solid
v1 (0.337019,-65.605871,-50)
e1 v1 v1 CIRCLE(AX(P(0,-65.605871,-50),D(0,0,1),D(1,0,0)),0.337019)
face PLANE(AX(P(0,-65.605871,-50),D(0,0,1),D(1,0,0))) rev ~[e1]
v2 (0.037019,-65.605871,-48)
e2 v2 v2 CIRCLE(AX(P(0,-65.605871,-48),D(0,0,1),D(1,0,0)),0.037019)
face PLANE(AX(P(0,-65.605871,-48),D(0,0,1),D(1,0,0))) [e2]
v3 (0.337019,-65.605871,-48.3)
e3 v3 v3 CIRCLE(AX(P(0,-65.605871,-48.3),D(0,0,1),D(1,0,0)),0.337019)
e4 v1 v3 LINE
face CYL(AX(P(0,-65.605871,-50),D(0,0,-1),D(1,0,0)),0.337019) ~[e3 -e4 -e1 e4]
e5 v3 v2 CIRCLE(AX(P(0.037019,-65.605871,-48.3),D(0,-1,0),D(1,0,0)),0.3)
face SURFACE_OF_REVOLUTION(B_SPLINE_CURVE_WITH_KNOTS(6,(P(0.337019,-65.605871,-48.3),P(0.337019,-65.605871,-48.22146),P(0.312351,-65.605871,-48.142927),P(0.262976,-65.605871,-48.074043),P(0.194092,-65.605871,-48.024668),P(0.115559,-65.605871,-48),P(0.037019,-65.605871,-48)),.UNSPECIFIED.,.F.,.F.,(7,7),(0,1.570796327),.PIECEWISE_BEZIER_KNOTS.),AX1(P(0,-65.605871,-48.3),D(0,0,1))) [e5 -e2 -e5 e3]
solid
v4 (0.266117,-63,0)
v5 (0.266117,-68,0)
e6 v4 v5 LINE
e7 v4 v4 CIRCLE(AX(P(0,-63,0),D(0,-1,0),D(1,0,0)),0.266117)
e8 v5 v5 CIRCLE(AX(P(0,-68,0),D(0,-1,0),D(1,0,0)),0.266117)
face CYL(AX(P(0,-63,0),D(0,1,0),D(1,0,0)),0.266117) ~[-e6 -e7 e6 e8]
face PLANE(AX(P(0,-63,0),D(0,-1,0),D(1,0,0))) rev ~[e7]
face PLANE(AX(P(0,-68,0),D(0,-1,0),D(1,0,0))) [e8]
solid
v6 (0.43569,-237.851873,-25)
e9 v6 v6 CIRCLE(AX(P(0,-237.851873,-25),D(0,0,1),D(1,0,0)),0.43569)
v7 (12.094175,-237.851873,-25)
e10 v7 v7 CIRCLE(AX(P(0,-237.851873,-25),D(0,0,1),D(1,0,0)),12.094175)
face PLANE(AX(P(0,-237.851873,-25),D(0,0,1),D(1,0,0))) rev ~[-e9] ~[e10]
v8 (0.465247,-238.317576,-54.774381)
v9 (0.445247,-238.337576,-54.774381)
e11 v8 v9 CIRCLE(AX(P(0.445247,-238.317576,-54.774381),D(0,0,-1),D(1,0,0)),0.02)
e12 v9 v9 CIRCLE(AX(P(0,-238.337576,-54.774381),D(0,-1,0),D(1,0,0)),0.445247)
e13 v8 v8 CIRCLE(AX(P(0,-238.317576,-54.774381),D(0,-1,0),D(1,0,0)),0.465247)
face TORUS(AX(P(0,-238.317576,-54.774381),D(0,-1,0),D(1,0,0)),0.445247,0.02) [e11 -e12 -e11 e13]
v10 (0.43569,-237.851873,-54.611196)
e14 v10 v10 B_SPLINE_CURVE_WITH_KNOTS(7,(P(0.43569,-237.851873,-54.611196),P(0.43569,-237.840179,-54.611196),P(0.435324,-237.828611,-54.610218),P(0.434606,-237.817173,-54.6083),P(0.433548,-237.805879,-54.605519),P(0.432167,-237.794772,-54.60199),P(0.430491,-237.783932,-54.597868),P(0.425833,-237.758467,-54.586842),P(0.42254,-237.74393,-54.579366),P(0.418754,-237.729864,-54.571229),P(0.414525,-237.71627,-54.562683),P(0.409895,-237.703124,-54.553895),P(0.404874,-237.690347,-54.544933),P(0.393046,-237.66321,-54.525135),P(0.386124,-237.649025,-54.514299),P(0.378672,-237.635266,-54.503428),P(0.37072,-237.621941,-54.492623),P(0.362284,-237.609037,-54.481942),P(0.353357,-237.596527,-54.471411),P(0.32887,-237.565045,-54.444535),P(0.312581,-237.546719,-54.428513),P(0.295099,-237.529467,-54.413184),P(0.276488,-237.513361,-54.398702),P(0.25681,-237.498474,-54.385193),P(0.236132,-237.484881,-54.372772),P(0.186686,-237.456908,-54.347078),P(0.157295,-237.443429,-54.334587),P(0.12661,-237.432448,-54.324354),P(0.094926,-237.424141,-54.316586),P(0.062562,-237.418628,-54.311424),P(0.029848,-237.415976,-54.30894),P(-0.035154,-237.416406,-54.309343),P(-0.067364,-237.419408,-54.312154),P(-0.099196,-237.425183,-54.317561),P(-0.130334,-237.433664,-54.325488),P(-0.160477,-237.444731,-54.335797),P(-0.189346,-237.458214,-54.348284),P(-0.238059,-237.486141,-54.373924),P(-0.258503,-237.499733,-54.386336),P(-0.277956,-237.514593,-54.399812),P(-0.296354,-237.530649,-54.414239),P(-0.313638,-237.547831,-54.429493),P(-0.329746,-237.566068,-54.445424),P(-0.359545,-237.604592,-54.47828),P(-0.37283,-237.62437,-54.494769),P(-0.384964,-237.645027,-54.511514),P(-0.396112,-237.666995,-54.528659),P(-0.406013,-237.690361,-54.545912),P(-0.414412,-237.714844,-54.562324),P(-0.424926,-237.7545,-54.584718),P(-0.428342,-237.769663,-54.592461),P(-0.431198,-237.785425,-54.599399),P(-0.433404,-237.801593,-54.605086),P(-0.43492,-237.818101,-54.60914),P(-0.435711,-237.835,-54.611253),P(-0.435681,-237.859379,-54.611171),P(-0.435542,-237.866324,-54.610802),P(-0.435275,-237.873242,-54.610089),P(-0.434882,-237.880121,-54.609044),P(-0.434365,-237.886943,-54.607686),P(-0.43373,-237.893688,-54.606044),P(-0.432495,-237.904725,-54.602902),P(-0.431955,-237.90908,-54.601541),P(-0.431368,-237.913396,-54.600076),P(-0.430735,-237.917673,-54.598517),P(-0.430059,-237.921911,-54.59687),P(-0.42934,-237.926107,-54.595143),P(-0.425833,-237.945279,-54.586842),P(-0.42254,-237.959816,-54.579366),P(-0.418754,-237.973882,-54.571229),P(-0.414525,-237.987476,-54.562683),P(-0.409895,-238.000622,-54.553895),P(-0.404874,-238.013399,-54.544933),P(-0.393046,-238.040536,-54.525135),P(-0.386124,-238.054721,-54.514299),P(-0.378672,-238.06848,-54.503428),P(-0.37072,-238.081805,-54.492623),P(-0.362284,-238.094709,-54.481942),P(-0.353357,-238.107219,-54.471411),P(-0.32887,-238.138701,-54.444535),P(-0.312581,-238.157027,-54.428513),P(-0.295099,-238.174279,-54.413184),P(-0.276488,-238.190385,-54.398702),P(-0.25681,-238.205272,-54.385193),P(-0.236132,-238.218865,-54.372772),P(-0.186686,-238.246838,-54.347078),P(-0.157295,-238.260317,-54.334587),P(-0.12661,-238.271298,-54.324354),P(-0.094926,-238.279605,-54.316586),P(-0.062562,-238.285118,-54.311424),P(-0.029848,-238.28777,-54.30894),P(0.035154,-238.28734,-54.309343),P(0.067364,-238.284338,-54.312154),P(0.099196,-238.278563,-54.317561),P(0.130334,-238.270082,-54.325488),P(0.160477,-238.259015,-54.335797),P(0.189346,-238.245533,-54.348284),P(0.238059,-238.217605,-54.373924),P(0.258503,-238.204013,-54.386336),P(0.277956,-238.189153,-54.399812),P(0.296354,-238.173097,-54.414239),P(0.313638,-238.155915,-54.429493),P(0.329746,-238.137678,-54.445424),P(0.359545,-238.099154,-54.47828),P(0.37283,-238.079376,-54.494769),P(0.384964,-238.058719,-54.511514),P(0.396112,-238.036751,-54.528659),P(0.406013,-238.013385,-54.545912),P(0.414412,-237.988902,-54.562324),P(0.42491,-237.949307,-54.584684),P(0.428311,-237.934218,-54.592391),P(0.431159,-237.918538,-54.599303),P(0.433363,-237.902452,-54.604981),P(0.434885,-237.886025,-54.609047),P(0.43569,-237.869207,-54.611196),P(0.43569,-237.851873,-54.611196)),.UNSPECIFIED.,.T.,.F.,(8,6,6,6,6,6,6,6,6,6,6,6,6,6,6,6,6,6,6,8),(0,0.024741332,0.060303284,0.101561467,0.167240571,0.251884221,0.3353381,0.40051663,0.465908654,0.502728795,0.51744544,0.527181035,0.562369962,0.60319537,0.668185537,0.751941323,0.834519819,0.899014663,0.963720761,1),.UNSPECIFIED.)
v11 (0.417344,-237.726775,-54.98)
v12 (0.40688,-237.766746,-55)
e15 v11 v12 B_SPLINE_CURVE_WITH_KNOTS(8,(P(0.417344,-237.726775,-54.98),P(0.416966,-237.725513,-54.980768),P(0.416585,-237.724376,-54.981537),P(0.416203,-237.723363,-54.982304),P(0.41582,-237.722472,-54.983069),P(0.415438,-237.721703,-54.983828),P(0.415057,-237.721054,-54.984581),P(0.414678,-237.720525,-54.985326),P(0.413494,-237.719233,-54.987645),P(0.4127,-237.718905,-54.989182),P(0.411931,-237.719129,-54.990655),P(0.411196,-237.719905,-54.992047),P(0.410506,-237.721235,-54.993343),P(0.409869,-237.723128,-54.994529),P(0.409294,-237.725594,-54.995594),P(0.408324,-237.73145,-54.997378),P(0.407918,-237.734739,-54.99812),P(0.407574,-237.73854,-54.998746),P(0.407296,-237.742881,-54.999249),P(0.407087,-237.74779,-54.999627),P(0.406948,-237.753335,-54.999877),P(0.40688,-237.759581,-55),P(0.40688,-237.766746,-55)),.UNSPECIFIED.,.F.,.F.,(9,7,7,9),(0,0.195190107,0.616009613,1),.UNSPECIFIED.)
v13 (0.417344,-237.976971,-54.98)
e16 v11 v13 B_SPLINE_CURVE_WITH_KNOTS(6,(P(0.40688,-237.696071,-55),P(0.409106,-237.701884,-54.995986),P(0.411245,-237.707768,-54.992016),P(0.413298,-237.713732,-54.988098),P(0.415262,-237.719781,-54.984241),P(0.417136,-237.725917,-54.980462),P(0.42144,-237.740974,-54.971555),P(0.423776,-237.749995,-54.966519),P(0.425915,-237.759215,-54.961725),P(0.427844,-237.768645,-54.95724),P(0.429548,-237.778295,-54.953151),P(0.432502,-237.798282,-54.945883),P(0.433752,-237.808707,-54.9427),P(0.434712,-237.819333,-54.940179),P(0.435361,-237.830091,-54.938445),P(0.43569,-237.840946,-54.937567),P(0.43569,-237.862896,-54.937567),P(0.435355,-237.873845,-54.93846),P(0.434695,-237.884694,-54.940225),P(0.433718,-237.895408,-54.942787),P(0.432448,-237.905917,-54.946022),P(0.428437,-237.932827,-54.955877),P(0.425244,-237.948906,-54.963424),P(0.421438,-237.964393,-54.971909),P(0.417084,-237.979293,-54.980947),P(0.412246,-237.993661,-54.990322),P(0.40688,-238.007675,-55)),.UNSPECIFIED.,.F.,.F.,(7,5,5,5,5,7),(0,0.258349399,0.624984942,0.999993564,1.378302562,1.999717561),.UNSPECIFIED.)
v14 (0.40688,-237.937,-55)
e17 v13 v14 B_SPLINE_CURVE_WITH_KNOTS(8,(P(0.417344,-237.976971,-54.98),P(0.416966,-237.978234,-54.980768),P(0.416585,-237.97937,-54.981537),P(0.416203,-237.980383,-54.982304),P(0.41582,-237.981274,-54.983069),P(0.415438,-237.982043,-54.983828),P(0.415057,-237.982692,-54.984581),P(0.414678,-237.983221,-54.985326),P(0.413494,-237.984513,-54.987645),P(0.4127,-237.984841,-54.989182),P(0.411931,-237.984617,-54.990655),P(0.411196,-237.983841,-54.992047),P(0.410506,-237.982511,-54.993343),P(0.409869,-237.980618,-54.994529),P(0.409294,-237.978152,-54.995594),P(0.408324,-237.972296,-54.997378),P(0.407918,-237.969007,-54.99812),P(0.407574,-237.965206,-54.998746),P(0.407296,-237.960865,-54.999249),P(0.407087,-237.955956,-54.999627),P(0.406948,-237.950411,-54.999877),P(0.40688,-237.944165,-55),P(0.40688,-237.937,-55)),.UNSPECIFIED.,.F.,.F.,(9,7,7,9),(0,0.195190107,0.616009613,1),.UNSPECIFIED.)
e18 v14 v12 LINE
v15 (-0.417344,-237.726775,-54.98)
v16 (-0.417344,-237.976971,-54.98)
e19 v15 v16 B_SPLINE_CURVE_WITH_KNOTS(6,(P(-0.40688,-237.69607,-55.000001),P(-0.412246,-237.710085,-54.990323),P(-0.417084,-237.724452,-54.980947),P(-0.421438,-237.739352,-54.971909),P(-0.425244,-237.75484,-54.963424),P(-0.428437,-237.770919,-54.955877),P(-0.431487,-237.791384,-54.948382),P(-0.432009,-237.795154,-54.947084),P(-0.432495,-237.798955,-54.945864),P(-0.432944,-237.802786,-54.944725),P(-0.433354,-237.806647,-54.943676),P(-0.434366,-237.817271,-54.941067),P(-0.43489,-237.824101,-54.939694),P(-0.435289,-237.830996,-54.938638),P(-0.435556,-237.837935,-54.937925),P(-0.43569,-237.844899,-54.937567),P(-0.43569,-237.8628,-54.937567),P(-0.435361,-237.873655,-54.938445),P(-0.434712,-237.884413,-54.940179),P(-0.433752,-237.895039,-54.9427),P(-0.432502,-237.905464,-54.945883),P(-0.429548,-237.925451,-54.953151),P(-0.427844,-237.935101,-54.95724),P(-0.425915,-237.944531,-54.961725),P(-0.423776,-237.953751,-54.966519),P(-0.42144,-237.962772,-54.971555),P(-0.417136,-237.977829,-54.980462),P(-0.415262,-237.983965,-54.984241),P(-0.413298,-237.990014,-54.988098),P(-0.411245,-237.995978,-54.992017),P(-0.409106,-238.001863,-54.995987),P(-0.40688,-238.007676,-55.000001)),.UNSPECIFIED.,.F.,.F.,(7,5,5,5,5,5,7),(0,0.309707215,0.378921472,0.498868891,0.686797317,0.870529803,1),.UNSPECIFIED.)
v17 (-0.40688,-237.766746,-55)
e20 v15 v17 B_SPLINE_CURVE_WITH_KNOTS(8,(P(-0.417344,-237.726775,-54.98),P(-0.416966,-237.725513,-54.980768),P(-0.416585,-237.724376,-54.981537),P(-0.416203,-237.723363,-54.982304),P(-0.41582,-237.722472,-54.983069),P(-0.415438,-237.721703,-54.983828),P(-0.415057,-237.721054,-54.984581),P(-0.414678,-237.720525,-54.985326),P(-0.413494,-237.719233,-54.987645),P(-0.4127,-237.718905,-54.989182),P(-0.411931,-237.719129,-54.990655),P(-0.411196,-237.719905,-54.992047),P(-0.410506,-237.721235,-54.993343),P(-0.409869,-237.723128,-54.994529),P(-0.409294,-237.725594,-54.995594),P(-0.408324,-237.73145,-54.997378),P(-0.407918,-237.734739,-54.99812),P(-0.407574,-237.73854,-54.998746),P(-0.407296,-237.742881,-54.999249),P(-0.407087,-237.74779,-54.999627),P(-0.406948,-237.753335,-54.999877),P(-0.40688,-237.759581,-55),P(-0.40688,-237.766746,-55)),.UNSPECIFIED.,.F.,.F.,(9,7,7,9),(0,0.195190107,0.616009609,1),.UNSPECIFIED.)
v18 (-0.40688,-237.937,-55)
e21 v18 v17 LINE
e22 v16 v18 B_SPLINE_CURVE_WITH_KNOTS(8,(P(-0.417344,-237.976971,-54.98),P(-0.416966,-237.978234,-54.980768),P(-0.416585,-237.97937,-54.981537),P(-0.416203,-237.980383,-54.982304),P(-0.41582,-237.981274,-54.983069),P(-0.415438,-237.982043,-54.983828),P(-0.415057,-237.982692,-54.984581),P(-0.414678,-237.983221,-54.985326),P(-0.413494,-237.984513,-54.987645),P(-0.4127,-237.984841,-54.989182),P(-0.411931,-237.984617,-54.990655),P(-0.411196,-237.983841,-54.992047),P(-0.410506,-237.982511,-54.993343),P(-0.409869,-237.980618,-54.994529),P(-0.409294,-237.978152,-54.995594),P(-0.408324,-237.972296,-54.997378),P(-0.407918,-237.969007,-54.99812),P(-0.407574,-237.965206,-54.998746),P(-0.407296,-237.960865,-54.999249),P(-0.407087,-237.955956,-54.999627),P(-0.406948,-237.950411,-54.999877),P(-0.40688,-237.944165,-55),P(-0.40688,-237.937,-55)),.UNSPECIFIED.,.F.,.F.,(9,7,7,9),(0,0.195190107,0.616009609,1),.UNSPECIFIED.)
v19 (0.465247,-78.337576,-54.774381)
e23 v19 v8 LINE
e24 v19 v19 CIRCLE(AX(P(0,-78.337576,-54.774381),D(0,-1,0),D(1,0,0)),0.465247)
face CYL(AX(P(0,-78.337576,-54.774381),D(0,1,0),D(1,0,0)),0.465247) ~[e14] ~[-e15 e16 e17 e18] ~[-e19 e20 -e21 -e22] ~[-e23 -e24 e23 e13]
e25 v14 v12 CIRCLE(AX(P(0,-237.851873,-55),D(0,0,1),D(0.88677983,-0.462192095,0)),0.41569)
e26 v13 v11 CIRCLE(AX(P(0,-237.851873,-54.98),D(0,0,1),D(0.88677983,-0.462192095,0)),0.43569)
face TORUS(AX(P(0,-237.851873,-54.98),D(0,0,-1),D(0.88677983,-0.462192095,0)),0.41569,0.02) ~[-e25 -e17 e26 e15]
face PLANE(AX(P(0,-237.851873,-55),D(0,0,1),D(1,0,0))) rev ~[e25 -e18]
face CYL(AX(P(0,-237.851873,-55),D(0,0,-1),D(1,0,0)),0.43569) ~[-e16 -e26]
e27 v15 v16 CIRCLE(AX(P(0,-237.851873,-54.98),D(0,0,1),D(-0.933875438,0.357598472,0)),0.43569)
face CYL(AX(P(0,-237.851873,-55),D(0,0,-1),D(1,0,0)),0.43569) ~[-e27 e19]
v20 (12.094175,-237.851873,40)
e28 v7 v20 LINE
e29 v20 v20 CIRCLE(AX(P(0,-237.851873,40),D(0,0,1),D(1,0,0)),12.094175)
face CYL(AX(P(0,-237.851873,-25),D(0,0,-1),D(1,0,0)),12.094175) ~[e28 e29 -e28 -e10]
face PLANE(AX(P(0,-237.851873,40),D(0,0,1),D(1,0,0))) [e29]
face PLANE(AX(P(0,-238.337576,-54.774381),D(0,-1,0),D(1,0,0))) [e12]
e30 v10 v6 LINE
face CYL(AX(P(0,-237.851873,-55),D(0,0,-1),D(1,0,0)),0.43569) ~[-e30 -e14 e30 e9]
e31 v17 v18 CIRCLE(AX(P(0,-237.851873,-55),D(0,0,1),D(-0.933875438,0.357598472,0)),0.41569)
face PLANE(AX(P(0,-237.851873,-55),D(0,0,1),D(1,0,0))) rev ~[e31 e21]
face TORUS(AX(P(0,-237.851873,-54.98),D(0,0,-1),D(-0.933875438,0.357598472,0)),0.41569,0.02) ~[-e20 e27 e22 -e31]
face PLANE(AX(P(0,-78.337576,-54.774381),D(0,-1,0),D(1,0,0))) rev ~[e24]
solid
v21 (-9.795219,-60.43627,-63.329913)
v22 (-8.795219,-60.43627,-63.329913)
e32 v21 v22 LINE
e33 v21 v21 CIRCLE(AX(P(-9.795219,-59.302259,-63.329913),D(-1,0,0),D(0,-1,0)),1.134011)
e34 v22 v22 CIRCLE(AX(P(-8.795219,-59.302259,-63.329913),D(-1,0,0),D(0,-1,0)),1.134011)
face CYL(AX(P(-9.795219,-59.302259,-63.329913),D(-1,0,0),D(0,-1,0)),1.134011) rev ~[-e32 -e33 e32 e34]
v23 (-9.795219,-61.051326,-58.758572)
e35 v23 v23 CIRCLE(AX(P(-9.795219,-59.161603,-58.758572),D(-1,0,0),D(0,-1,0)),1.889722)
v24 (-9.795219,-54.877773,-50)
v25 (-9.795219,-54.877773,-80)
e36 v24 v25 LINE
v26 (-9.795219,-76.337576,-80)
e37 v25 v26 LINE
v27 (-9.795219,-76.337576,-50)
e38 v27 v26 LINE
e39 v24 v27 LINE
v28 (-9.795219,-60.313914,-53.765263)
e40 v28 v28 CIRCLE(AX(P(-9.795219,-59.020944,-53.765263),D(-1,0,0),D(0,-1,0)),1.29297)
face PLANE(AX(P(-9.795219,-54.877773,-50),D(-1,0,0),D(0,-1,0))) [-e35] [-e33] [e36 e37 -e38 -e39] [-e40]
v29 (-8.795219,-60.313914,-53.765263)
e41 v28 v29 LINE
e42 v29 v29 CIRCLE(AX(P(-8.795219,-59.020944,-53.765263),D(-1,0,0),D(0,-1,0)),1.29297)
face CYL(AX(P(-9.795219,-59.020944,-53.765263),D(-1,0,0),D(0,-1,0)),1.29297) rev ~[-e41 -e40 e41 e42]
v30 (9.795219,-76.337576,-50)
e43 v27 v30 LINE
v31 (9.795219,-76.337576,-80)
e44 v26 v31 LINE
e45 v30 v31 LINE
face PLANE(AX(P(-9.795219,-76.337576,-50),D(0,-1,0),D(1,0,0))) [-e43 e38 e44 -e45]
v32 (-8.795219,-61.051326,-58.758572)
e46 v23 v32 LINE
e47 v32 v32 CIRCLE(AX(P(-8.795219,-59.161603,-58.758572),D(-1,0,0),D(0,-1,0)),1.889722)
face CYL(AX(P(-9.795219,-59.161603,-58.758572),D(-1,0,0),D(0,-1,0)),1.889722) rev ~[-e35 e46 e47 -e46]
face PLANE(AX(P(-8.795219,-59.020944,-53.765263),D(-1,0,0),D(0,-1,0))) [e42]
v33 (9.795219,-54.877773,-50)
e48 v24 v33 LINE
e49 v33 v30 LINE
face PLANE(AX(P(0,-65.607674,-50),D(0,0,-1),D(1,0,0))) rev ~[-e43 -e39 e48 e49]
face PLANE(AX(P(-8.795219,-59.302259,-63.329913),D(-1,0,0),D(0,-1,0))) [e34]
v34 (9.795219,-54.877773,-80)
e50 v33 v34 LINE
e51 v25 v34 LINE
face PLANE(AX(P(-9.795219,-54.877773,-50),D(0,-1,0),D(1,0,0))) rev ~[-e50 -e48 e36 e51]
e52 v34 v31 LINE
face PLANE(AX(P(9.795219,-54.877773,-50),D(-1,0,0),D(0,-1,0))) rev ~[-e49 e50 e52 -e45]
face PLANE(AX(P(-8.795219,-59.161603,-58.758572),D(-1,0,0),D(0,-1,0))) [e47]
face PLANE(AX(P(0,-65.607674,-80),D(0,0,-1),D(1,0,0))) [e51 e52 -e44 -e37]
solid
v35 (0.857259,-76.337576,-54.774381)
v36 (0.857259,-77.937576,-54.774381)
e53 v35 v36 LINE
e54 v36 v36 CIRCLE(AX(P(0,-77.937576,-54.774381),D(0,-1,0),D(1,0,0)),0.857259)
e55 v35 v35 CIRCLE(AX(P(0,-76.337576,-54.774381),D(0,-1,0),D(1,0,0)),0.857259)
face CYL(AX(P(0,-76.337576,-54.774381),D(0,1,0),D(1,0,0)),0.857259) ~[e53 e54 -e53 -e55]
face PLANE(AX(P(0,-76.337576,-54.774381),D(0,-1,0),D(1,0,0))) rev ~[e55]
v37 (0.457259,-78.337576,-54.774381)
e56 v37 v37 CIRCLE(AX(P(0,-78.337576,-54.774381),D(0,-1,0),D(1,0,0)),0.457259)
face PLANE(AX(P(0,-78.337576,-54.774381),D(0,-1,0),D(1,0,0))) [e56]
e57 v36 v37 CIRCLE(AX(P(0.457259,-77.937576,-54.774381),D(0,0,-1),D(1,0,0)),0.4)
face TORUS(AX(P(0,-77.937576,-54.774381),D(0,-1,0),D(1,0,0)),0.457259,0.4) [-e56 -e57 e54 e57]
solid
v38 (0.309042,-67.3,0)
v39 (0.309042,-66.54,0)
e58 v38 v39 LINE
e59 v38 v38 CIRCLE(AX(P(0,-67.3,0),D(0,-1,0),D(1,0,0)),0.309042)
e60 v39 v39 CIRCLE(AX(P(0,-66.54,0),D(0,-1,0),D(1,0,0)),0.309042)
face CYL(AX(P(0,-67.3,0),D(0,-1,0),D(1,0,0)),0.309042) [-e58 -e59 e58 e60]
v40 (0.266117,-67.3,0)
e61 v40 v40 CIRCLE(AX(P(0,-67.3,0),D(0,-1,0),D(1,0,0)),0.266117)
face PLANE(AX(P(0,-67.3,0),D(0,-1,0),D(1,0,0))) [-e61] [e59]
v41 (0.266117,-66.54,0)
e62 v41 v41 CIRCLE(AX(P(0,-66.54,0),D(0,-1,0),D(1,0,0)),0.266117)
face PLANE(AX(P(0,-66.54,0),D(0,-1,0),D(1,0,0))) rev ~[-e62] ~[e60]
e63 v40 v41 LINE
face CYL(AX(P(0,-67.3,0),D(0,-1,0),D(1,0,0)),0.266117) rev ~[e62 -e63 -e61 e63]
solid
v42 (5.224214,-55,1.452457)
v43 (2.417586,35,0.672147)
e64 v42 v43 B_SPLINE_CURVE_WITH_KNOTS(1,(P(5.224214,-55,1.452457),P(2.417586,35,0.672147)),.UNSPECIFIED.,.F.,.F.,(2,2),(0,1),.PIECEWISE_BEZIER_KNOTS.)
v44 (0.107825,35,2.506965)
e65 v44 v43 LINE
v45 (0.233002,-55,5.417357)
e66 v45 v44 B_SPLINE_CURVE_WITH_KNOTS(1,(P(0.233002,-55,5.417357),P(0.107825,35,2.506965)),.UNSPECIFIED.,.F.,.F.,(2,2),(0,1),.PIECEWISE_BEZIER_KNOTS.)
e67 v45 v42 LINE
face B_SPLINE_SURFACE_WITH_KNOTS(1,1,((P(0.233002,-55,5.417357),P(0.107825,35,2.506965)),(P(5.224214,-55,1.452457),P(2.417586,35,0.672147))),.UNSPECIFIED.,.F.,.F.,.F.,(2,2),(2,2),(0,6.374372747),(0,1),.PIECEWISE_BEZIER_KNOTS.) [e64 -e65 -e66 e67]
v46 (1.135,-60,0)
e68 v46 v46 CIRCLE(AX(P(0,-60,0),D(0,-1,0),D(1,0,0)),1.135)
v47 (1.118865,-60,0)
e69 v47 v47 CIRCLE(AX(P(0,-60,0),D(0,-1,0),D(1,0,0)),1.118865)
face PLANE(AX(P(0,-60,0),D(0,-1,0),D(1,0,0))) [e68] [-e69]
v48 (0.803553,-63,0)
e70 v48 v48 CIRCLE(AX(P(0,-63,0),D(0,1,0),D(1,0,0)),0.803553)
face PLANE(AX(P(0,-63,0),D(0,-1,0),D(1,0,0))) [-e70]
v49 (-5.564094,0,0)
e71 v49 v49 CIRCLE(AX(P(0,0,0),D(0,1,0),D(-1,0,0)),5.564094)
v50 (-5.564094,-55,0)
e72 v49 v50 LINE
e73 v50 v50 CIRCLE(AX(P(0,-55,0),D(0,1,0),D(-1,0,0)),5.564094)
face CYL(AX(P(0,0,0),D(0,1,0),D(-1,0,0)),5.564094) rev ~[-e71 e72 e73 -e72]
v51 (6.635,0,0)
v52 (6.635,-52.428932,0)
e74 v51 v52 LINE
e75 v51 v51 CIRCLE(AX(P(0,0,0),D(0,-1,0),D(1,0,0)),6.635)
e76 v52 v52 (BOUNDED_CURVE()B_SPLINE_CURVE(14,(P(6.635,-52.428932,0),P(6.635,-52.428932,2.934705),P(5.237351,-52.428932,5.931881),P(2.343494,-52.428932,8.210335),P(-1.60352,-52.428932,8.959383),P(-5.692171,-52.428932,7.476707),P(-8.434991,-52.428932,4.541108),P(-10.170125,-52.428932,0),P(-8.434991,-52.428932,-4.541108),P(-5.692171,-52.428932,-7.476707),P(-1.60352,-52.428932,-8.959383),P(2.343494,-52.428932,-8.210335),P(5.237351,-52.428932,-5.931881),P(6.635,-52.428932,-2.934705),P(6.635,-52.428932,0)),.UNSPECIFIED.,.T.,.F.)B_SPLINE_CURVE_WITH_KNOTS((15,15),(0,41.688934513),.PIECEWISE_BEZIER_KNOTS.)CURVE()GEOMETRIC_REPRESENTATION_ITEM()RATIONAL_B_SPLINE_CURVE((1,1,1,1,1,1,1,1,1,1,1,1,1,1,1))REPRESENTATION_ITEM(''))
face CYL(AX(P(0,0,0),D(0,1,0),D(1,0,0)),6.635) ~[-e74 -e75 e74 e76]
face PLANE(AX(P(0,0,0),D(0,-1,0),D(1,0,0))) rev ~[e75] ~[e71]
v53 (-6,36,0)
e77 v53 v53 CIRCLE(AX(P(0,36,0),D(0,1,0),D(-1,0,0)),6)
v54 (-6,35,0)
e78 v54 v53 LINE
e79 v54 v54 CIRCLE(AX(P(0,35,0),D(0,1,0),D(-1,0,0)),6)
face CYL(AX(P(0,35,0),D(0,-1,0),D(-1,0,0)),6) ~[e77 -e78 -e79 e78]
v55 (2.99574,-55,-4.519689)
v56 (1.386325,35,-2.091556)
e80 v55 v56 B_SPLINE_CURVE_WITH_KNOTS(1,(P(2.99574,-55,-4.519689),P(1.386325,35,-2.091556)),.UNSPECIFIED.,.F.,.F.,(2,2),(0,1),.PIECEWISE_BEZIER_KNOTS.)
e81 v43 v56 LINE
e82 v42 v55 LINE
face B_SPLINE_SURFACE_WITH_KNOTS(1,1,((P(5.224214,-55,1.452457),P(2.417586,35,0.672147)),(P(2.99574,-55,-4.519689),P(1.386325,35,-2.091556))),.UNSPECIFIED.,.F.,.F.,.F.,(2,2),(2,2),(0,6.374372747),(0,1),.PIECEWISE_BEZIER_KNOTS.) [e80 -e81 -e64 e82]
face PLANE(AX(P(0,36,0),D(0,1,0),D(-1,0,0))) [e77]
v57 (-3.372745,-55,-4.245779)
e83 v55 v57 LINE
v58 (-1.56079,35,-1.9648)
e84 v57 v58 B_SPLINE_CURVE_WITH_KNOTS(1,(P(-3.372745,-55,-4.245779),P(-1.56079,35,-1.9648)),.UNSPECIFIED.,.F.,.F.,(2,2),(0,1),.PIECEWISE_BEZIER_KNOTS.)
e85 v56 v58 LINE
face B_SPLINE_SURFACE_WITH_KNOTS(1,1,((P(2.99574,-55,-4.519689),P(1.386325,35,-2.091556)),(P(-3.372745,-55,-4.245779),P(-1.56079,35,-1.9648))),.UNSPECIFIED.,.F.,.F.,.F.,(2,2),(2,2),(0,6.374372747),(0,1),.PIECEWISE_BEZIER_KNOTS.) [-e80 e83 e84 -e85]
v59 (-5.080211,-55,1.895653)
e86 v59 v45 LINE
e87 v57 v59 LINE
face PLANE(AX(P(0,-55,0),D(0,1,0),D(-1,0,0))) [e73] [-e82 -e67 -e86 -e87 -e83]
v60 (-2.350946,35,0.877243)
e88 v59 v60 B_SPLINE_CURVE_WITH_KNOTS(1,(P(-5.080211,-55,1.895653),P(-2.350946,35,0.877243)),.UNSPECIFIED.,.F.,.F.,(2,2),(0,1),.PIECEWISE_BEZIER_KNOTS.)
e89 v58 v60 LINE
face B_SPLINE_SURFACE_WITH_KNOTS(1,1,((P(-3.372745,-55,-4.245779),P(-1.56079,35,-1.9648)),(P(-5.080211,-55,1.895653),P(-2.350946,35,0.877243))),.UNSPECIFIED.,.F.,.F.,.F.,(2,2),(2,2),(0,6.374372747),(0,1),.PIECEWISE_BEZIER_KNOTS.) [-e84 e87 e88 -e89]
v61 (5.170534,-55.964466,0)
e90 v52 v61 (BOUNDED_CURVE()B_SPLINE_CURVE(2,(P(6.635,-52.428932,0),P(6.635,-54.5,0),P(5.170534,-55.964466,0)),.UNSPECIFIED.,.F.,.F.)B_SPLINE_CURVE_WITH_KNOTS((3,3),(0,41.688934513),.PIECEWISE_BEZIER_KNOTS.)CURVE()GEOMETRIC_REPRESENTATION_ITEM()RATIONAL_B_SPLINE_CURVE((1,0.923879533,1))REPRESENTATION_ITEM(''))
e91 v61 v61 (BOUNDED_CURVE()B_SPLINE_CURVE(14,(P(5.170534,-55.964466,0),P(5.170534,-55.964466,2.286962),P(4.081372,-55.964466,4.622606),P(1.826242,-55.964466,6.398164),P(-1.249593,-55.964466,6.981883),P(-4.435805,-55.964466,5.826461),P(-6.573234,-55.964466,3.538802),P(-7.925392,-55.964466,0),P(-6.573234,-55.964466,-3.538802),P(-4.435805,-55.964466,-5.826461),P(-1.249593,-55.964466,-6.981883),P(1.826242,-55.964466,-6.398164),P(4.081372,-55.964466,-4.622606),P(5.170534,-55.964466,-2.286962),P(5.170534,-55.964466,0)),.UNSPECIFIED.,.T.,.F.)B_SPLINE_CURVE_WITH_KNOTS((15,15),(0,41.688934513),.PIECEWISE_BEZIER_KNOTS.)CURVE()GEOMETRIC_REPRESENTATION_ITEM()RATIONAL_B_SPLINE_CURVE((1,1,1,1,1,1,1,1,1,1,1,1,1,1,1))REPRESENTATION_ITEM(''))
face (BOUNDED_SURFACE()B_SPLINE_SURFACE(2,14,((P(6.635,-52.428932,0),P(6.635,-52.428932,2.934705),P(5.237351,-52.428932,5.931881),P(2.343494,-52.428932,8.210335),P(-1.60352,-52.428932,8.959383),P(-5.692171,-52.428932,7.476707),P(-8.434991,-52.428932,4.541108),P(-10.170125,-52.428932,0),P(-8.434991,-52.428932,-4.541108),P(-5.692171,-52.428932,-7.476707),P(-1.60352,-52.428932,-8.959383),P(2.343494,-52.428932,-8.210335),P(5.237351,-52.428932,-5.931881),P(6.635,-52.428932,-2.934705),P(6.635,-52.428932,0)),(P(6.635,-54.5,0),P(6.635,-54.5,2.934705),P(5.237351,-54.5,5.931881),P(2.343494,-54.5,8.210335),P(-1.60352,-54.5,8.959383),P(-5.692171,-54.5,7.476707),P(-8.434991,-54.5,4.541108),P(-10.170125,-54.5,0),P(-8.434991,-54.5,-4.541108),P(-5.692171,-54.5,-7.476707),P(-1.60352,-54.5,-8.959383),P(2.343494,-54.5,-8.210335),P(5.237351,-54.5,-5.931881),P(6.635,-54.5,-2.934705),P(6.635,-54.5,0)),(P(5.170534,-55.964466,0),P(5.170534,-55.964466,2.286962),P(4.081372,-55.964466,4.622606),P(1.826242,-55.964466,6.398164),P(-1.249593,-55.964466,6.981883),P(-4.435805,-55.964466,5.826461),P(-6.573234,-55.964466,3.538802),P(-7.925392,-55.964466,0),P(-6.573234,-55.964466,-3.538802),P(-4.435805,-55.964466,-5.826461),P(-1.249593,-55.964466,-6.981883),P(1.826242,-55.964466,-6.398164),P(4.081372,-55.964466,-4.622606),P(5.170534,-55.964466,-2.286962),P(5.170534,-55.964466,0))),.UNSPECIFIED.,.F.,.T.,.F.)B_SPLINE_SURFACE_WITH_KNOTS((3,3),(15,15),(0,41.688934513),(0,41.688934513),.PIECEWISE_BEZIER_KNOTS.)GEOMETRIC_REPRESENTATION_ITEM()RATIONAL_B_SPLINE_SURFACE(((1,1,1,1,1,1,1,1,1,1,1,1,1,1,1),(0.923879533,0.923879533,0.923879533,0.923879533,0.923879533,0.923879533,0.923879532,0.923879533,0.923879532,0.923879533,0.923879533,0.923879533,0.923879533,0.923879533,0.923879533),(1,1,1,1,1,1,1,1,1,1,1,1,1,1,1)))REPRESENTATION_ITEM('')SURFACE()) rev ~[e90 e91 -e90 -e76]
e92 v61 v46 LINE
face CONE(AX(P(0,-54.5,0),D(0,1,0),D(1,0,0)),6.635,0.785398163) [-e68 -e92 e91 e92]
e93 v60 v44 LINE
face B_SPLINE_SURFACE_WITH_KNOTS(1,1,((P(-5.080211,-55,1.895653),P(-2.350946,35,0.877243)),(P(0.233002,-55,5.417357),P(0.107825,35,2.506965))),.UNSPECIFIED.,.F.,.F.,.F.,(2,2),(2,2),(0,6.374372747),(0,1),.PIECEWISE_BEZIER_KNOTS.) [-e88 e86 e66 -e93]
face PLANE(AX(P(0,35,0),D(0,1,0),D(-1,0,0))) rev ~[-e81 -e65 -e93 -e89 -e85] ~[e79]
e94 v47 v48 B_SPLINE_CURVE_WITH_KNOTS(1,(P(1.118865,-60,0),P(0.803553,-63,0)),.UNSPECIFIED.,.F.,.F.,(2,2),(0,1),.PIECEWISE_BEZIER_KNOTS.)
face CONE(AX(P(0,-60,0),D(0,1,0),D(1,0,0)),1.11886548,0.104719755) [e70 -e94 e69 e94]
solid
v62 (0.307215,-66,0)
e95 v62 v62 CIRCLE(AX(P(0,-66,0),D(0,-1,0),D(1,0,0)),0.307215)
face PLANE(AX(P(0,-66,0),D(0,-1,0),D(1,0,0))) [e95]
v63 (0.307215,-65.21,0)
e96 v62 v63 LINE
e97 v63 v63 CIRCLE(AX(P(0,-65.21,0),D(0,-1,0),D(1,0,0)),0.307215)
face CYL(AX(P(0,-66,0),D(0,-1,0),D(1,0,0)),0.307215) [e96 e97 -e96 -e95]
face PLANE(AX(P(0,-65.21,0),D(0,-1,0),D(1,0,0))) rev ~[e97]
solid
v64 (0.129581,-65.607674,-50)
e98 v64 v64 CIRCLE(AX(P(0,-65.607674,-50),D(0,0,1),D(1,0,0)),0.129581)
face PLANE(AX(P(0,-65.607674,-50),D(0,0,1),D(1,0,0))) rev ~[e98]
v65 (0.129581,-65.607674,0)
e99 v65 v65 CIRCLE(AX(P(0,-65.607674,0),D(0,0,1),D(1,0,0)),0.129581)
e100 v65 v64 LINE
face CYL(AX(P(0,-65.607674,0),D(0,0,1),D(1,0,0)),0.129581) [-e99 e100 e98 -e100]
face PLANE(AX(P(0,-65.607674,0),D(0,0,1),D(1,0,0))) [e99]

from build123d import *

# Parameters (mm, degrees)
F0_R         = 6.635
F1_DEPTH     = 60
F2_R         = 5.5640936577
F3_DEPTH     = 55
F5_DEPTH     = 90
F5_TAPER     = 1.5
F6_R         = 6
F7_DEPTH     = 1
F8_SIZE      = 5.5
F9_R         = 5
F10_R        = 1.1188654797
F11_DEPTH    = 3
F11_TAPER    = 6
F12_R        = 0.2661166515
F13_DEPTH    = 5
F15_START    = -0.7
F14_R        = 0.3090418991
F14_R_2      = 0.2661166515
F15_DEPTH    = 0.76
F17_START    = -2
F16_R        = 0.3072145748
F17_DEPTH    = 0.79
F19_R        = 0.1295808952
F20_DEPTH    = 50
F21_W        = 19.5904374123
F21_H        = 21.4598029852
F22_DEPTH    = 30
F23_R        = 0.3370193149
F24_DEPTH    = 2
F25_R        = 0.3
F26_R        = 0.8572593425
F27_DEPTH    = 2
F28_R        = 0.4
F29_R        = 1.2929704819
F29_R_2      = 1.8897224416
F29_R_3      = 1.1340105919
F30_DEPTH    = 1
F31_R        = 0.4652474762
F32_DEPTH    = 160
F35_R        = 0.4356898576
F36_DEPTH    = 30
F37_F1_R     = 0.02
F37_F2_R     = 0.02
F37_T6_ANGLE = 55.0572993012
F37_S7_R     = 0.4652474762
F37_T8_DEPTH = 2
F38_R        = 12.0941748202
F39_DEPTH    = 65


# Not quite as in the source:
# - a fillet or chamfer that OpenCascade refuses, or shapes differently, is made with other operations: its cross-section is extruded or revolved along the edge and cut away or added
# - a feature of the source that left no trace in its solid (it failed there, or was rolled back) is left out


with BuildPart() as f1:
    # F0 (on Front) → F1 (new body)
    with BuildSketch(Plane.XZ):
        Circle(F0_R)
    extrude(amount=F1_DEPTH)

    # F2 (on face) → F3 (cut)
    with BuildSketch(Plane(origin=(0, 0, 0), x_dir=(-1, 0, 0), z_dir=(0, 1, 0))):
        Circle(F2_R)
    extrude(amount=-F3_DEPTH, mode=Mode.SUBTRACT)

    # F4 (on face) → F5 (join)
    with BuildSketch(Plane(origin=(0, -55, 0), x_dir=(-1, 0, 0), z_dir=(0, 1, 0))):
        Polygon((-0.2330018257, 5.4173569127), (-5.2242141168, 1.452457446), (-2.995740063, -4.5196888438), (3.3727449364, -4.24577877), (5.080211069, 1.8956532552), align=None)
    extrude(amount=F5_DEPTH, taper=F5_TAPER)

    # F6 (on face) → F7 (join)
    with BuildSketch(Plane(origin=(0, 35, 0), x_dir=(-1, 0, 0), z_dir=(0, 1, 0))):
        Circle(F6_R)
    extrude(amount=F7_DEPTH)

    # F8
    f8_edges = [f1.edges().sort_by_distance(p)[0] for p in [
        (-6.635, -60, 0),
    ]]
    chamfer(f8_edges, length=F8_SIZE)

    # F9
    f9_edges = [f1.edges().sort_by_distance(p)[0] for p in [
        (-6.635, -54.5, 0),
    ]]
    fillet(f9_edges, radius=F9_R)

    # F10 (on face) → F11 (join)
    with BuildSketch(Plane.XZ.offset(60)):
        Circle(F10_R)
    extrude(amount=F11_DEPTH, taper=F11_TAPER)


with BuildPart() as f13:
    # F12 (on face) → F13 (new body)
    with BuildSketch(Plane.XZ.offset(63)):
        Circle(F12_R)
    extrude(amount=F13_DEPTH)


with BuildPart() as f15:
    # F14 (on face) → F15 (new body)
    with BuildSketch(Plane.XZ.offset(68).offset(F15_START)):
        Circle(F14_R)
        Circle(F14_R_2, mode=Mode.SUBTRACT)
    extrude(amount=-F15_DEPTH)


with BuildPart() as f17:
    # F16 (on face) → F17 (new body)
    with BuildSketch(Plane.XZ.offset(68).offset(F17_START)):
        Circle(F16_R)
    extrude(amount=-F17_DEPTH)


with BuildPart() as f20:
    # F19 (on Top) → F20 (new body)
    with BuildSketch(Plane.XY):
        with Locations((0, -65.6076744199)):
            Circle(F19_R)
    extrude(amount=-F20_DEPTH)


with BuildPart() as f22:
    # F21 (on face) → F22 (new body)
    with BuildSketch(Plane(origin=(0, 0, -50), x_dir=(1, 0, 0), z_dir=(0, 0, -1))):
        with Locations((0, 65.6076744199)):
            Rectangle(F21_W, F21_H)
    extrude(amount=F22_DEPTH)

    # F29 (on face) → F30 (cut)
    with BuildSketch(Plane(origin=(-9.7952187061, 0, 0), x_dir=(0, -1, 0), z_dir=(-1, 0, 0))):
        with Locations((59.0209439397, -53.7652634084)):
            Circle(F29_R)
        with Locations((59.1616034508, -58.758571744)):
            Circle(F29_R_2)
        with Locations((59.3022592366, -63.3299127221)):
            Circle(F29_R_3)
    extrude(amount=-F30_DEPTH, mode=Mode.SUBTRACT)


with BuildPart() as f24:
    # F23 (on face) → F24 (new body)
    with BuildSketch(Plane.XY.offset(-50)):
        with Locations((0, -65.6058713794)):
            Circle(F23_R)
    extrude(amount=F24_DEPTH)

    # F25
    f25_edges = [f24.edges().sort_by_distance(p)[0] for p in [
        (-0.337019, -65.605871, -48),
    ]]
    fillet(f25_edges, radius=F25_R)


with BuildPart() as f27:
    # F26 (on face) → F27 (new body)
    with BuildSketch(Plane.XZ.offset(76.3375759125)):
        with Locations((0, -54.7743812203)):
            Circle(F26_R)
    extrude(amount=F27_DEPTH)

    # F28
    f28_edges = [f27.edges().sort_by_distance(p)[0] for p in [
        (-0.857259, -78.337576, -54.774381),
    ]]
    fillet(f28_edges, radius=F28_R)


with BuildPart() as f32:
    # F31 (on face) → F32 (new body)
    with BuildSketch(Plane.XZ.offset(78.3375759125)):
        with Locations((0, -54.7743812203)):
            Circle(F31_R)
    extrude(amount=F32_DEPTH)

    # F35 (on offset) → F36 (join)
    with BuildSketch(Plane.XY.offset(-55)):
        with Locations((0, -237.8518730402)):
            Circle(F35_R)
    extrude(amount=F36_DEPTH)

    # F37: fillet of radius 0.02 on 3 edges, made by hand

    # F37_f1
    f37_f1_edges = [f32.edges().sort_by_distance(p)[0] for p in [
        (-0.4652474762, -238.3375759125, -54.7743812203),
    ]]
    fillet(f37_f1_edges, radius=F37_F1_R)

    # F37_f2
    f37_f2_edges = [f32.edges().sort_by_distance(p)[0] for p in [
        (-0.4356898576, -237.8518730402, -55),
    ]]
    fillet(f37_f2_edges, radius=F37_F2_R)


with BuildPart() as f37_tool4:
    # F37_s5 → F37_t6 (revolve)
    with BuildSketch(Plane(origin=(-97.4865926005, -187.0415928726, 0), x_dir=(0, 0, 1), z_dir=(-0.4621920882, -0.8867798338, 0))):
        with BuildLine():
            ThreePointArc((-54.98, -110.3689437327), (-54.9941421356, -110.3630858683), (-55, -110.3489437327))
            Line((-55, -110.3489437327), (-55.0004, -110.3489437327))
            Line((-55.0004, -110.3489437327), (-55.0004, -110.3693437327))
            Line((-55.0004, -110.3693437327), (-54.98, -110.3693437327))
            Line((-54.98, -110.3693437327), (-54.98, -110.3689437327))
        make_face()
    revolve(axis=Axis((0, -237.8518730402, -55), (0, 0, 1)), revolution_arc=F37_T6_ANGLE)

    # F37_s7 → F37_t8 (cut, symmetric)
    with BuildSketch(Plane.XZ.offset(237.9)):
        with Locations((0, -54.7743812203)):
            Circle(F37_S7_R)
    extrude(amount=F37_T8_DEPTH, both=True, mode=Mode.SUBTRACT)


with BuildPart() as f32_1:
    add(f32.part)

    # F37_t3: cut F37_tool4
    add(f37_tool4.part, mode=Mode.SUBTRACT)

    # F38 (on face) → F39 (join)
    with BuildSketch(Plane.XY.offset(-25)):
        with Locations((0, -237.8518730402)):
            Circle(F38_R)
    extrude(amount=F39_DEPTH)


solid = Compound([f1.part, f13.part, f15.part, f17.part, f20.part, f22.part, f24.part, f27.part, f32_1.part])
